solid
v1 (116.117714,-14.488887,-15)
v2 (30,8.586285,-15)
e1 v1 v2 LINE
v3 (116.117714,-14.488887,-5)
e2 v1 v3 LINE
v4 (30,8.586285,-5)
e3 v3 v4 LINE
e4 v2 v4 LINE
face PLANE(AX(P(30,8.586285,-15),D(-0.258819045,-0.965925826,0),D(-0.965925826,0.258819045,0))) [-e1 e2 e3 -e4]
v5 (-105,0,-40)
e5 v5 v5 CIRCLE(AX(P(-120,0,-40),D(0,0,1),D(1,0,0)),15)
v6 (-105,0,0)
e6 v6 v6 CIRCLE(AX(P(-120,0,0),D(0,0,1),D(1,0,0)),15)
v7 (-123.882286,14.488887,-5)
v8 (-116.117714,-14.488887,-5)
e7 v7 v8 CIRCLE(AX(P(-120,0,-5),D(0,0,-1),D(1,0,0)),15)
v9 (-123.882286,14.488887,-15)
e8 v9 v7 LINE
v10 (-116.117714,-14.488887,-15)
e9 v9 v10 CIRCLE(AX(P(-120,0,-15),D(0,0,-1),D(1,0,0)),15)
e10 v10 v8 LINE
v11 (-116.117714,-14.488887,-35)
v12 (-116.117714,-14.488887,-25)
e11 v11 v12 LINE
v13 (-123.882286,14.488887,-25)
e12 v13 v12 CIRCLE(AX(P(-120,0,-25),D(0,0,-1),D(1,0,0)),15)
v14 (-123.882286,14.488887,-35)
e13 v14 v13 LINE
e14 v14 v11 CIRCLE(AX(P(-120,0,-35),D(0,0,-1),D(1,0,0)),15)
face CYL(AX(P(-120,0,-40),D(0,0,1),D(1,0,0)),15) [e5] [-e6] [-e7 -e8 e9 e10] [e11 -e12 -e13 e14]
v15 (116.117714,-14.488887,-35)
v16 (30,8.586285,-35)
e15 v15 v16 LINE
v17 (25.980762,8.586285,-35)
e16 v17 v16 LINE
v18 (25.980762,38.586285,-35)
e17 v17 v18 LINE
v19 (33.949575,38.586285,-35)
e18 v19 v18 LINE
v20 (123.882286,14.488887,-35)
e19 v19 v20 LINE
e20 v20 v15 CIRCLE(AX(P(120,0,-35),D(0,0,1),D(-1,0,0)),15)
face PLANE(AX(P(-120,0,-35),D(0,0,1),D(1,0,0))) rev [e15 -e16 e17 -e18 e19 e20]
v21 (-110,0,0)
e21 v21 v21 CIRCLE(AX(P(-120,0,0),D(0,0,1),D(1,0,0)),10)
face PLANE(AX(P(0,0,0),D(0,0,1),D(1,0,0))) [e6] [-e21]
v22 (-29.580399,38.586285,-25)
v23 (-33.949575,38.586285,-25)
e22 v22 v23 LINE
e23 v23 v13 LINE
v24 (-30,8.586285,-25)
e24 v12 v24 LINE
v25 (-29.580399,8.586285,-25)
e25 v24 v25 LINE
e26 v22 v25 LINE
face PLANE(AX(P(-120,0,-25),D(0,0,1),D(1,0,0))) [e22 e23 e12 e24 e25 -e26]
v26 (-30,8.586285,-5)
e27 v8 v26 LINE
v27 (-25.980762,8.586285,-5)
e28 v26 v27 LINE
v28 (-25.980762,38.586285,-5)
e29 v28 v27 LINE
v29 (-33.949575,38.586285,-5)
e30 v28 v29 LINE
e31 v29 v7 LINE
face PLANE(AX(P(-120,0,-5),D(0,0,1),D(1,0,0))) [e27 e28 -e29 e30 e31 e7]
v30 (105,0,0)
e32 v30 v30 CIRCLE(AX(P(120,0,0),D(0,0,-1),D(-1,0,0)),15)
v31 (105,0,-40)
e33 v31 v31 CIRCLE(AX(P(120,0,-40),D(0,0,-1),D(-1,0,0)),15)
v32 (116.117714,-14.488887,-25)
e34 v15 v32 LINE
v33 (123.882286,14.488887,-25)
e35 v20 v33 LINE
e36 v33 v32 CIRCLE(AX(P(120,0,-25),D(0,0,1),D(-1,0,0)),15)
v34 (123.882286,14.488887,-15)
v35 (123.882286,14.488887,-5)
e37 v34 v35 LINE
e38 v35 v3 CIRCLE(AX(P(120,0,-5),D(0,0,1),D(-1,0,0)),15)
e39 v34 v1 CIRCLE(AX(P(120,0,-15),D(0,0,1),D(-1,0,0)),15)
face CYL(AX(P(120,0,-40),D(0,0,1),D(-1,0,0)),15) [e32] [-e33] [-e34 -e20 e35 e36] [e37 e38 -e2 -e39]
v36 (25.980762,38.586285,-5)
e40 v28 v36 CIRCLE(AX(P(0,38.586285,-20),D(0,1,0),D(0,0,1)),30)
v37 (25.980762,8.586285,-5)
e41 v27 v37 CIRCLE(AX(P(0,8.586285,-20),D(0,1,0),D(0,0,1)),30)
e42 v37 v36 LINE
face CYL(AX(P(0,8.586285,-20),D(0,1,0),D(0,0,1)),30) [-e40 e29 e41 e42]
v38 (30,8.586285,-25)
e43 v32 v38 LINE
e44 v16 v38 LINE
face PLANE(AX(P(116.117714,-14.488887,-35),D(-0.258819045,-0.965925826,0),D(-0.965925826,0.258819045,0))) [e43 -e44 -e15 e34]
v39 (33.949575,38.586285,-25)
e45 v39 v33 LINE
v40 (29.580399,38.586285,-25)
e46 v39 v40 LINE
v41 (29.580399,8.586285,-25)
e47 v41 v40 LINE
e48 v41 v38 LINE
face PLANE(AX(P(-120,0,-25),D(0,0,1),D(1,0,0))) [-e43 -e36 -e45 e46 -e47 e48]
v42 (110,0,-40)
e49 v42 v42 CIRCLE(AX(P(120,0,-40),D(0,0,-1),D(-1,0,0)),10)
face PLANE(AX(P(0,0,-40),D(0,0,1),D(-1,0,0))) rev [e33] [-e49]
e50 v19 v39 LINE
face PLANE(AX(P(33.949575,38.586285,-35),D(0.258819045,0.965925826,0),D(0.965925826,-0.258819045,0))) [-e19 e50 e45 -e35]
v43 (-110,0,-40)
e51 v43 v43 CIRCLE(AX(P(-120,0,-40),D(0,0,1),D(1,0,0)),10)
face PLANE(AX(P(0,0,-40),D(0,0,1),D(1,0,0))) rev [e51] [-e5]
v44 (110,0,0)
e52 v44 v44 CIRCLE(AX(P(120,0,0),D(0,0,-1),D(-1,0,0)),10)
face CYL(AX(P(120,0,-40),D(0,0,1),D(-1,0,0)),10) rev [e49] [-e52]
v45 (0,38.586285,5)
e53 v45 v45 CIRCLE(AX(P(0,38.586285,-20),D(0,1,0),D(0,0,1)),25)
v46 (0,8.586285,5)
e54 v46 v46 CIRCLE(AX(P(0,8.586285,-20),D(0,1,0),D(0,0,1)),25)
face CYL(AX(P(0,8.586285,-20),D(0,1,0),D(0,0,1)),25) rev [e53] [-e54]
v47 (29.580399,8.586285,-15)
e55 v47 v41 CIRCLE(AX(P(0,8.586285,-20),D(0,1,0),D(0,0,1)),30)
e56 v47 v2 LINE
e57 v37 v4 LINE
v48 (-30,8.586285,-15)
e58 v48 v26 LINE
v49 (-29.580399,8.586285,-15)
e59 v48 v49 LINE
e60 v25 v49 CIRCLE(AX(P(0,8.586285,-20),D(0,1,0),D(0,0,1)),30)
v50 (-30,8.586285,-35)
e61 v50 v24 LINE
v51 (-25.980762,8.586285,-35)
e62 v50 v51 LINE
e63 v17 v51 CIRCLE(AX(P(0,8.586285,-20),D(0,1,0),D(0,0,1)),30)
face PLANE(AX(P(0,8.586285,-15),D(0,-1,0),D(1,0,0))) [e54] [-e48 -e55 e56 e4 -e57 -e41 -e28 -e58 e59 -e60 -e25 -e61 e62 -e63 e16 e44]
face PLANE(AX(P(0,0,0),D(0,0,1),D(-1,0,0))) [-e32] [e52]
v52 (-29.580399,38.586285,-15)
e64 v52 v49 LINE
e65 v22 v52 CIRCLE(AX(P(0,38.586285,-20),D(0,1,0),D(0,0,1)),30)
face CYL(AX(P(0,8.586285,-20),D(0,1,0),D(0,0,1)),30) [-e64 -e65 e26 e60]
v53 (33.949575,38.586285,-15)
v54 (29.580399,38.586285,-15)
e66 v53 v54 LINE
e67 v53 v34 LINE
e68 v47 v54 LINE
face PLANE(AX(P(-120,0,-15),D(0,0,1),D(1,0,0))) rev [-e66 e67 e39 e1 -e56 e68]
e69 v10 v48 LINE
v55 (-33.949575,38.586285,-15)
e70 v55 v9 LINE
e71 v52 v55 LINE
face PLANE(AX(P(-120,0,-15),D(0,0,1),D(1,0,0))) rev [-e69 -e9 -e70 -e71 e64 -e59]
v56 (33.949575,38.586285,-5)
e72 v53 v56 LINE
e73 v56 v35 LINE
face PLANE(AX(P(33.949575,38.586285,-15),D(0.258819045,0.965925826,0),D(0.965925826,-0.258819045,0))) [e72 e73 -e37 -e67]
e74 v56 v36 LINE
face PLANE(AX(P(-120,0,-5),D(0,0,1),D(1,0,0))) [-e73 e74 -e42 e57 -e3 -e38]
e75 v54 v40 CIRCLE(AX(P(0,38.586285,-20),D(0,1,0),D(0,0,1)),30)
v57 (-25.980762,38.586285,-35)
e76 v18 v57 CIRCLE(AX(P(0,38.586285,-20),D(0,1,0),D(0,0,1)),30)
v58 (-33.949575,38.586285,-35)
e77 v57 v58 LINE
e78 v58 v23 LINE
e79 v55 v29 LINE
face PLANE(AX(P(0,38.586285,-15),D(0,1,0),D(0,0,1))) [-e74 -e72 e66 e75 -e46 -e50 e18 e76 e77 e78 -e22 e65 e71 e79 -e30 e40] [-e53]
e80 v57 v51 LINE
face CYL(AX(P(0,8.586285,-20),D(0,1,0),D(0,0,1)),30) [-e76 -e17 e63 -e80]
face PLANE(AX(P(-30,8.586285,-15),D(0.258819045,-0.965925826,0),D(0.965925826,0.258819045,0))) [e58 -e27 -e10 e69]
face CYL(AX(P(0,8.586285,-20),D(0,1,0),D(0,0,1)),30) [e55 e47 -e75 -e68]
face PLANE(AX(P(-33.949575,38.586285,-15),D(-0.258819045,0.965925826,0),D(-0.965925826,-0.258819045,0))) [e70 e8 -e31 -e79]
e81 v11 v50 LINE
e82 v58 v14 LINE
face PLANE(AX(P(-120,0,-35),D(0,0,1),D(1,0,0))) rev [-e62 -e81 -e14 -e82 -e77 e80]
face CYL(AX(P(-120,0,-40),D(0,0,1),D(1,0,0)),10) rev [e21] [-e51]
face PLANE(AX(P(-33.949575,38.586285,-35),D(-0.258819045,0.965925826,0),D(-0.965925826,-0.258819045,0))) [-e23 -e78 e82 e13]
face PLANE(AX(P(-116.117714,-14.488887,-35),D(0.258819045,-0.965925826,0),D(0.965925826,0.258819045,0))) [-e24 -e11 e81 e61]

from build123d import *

# Parameters (mm, degrees)
SKETCH1_R           = 10
BOSS_EXTRUDE1_DEPTH = 40
BOSS_EXTRUDE2_START = -5
BOSS_EXTRUDE2_DEPTH = 10
BOSS_EXTRUDE3_START = -25
BOSS_EXTRUDE3_DEPTH = 10
SKETCH4_R           = 30
SKETCH4_R_2         = 25
BOSS_EXTRUDE4_DEPTH = 30
CUT_EXTRUDE3_START  = 50
SKETCH5_R           = 25
CUT_EXTRUDE3_DEPTH  = 50


with BuildPart() as part:
    # Sketch1 → Boss-Extrude1 (new body)
    with BuildSketch(Plane.XY):
        with BuildLine():
            ThreePointArc((-123.882285677, 14.488887394), (-134.488887394, -3.882285677), (-116.117714323, -14.488887394))
            ThreePointArc((-116.117714323, -14.488887394), (-108.099699896, -9.131421435), (-105, 0))
            ThreePointArc((-105, 0), (-110.868578565, 11.900300104), (-123.882285677, 14.488887394))
        make_face()
        with Locations((-120, 0)):
            Circle(SKETCH1_R, mode=Mode.SUBTRACT)
    extrude(amount=-BOSS_EXTRUDE1_DEPTH)

    # Sketch2 → Boss-Extrude2 (add)
    with BuildSketch(Plane.XY.offset(BOSS_EXTRUDE2_START)):
        with BuildLine():
            Line((0, 38.586284613), (0, 8.586284613))
            Line((0, 8.586284613), (-30, 8.586284613))
            Line((-30, 8.586284613), (-116.117714323, -14.488887394))
            ThreePointArc((-116.117714323, -14.488887394), (-105.511112606, 3.882285677), (-123.882285677, 14.488887394))
            Line((-123.882285677, 14.488887394), (-33.949574928, 38.586284613))
            Line((-33.949574928, 38.586284613), (0, 38.586284613))
        make_face()
    extrude(amount=-BOSS_EXTRUDE2_DEPTH)

    # Sketch3 → Boss-Extrude3 (add)
    with BuildSketch(Plane.XY.offset(BOSS_EXTRUDE3_START)):
        with BuildLine():
            Line((-116.117714323, -14.488887394), (-30, 8.586284613))
            Line((-30, 8.586284613), (0, 8.586284613))
            Line((0, 8.586284613), (0, 38.586284613))
            Line((0, 38.586284613), (-33.949574928, 38.586284613))
            Line((-33.949574928, 38.586284613), (-123.882285677, 14.488887394))
            ThreePointArc((-123.882285677, 14.488887394), (-105.511112606, 3.882285677), (-116.117714323, -14.488887394))
        make_face()
    extrude(amount=-BOSS_EXTRUDE3_DEPTH)

    # Mirror1: part across plane


with BuildPart() as part_1:
    add(part.part)
    add(part.part.mirror(Plane(origin=(0, 0, 0), x_dir=(0, 0, 1), z_dir=(1, 0, 0))))

    # Sketch4 → Boss-Extrude4 (add)
    with BuildSketch(Plane(origin=(0, 38.586284613, 0), x_dir=(1, 0, 0), z_dir=(0, 1, 0))):
        with Locations((0, 20)):
            Circle(SKETCH4_R)
        with Locations((0, 20)):
            Circle(SKETCH4_R_2, mode=Mode.SUBTRACT)
    extrude(amount=-BOSS_EXTRUDE4_DEPTH)

    # Sketch5 → Cut-Extrude3 (cut)
    with BuildSketch(Plane(origin=(0, 0, 0), x_dir=(1, 0, 0), z_dir=(0, 1, 0)).offset(CUT_EXTRUDE3_START)):
        with Locations((0, 20)):
            Circle(SKETCH5_R)
    extrude(amount=-CUT_EXTRUDE3_DEPTH, mode=Mode.SUBTRACT)


solid = part_1.part
